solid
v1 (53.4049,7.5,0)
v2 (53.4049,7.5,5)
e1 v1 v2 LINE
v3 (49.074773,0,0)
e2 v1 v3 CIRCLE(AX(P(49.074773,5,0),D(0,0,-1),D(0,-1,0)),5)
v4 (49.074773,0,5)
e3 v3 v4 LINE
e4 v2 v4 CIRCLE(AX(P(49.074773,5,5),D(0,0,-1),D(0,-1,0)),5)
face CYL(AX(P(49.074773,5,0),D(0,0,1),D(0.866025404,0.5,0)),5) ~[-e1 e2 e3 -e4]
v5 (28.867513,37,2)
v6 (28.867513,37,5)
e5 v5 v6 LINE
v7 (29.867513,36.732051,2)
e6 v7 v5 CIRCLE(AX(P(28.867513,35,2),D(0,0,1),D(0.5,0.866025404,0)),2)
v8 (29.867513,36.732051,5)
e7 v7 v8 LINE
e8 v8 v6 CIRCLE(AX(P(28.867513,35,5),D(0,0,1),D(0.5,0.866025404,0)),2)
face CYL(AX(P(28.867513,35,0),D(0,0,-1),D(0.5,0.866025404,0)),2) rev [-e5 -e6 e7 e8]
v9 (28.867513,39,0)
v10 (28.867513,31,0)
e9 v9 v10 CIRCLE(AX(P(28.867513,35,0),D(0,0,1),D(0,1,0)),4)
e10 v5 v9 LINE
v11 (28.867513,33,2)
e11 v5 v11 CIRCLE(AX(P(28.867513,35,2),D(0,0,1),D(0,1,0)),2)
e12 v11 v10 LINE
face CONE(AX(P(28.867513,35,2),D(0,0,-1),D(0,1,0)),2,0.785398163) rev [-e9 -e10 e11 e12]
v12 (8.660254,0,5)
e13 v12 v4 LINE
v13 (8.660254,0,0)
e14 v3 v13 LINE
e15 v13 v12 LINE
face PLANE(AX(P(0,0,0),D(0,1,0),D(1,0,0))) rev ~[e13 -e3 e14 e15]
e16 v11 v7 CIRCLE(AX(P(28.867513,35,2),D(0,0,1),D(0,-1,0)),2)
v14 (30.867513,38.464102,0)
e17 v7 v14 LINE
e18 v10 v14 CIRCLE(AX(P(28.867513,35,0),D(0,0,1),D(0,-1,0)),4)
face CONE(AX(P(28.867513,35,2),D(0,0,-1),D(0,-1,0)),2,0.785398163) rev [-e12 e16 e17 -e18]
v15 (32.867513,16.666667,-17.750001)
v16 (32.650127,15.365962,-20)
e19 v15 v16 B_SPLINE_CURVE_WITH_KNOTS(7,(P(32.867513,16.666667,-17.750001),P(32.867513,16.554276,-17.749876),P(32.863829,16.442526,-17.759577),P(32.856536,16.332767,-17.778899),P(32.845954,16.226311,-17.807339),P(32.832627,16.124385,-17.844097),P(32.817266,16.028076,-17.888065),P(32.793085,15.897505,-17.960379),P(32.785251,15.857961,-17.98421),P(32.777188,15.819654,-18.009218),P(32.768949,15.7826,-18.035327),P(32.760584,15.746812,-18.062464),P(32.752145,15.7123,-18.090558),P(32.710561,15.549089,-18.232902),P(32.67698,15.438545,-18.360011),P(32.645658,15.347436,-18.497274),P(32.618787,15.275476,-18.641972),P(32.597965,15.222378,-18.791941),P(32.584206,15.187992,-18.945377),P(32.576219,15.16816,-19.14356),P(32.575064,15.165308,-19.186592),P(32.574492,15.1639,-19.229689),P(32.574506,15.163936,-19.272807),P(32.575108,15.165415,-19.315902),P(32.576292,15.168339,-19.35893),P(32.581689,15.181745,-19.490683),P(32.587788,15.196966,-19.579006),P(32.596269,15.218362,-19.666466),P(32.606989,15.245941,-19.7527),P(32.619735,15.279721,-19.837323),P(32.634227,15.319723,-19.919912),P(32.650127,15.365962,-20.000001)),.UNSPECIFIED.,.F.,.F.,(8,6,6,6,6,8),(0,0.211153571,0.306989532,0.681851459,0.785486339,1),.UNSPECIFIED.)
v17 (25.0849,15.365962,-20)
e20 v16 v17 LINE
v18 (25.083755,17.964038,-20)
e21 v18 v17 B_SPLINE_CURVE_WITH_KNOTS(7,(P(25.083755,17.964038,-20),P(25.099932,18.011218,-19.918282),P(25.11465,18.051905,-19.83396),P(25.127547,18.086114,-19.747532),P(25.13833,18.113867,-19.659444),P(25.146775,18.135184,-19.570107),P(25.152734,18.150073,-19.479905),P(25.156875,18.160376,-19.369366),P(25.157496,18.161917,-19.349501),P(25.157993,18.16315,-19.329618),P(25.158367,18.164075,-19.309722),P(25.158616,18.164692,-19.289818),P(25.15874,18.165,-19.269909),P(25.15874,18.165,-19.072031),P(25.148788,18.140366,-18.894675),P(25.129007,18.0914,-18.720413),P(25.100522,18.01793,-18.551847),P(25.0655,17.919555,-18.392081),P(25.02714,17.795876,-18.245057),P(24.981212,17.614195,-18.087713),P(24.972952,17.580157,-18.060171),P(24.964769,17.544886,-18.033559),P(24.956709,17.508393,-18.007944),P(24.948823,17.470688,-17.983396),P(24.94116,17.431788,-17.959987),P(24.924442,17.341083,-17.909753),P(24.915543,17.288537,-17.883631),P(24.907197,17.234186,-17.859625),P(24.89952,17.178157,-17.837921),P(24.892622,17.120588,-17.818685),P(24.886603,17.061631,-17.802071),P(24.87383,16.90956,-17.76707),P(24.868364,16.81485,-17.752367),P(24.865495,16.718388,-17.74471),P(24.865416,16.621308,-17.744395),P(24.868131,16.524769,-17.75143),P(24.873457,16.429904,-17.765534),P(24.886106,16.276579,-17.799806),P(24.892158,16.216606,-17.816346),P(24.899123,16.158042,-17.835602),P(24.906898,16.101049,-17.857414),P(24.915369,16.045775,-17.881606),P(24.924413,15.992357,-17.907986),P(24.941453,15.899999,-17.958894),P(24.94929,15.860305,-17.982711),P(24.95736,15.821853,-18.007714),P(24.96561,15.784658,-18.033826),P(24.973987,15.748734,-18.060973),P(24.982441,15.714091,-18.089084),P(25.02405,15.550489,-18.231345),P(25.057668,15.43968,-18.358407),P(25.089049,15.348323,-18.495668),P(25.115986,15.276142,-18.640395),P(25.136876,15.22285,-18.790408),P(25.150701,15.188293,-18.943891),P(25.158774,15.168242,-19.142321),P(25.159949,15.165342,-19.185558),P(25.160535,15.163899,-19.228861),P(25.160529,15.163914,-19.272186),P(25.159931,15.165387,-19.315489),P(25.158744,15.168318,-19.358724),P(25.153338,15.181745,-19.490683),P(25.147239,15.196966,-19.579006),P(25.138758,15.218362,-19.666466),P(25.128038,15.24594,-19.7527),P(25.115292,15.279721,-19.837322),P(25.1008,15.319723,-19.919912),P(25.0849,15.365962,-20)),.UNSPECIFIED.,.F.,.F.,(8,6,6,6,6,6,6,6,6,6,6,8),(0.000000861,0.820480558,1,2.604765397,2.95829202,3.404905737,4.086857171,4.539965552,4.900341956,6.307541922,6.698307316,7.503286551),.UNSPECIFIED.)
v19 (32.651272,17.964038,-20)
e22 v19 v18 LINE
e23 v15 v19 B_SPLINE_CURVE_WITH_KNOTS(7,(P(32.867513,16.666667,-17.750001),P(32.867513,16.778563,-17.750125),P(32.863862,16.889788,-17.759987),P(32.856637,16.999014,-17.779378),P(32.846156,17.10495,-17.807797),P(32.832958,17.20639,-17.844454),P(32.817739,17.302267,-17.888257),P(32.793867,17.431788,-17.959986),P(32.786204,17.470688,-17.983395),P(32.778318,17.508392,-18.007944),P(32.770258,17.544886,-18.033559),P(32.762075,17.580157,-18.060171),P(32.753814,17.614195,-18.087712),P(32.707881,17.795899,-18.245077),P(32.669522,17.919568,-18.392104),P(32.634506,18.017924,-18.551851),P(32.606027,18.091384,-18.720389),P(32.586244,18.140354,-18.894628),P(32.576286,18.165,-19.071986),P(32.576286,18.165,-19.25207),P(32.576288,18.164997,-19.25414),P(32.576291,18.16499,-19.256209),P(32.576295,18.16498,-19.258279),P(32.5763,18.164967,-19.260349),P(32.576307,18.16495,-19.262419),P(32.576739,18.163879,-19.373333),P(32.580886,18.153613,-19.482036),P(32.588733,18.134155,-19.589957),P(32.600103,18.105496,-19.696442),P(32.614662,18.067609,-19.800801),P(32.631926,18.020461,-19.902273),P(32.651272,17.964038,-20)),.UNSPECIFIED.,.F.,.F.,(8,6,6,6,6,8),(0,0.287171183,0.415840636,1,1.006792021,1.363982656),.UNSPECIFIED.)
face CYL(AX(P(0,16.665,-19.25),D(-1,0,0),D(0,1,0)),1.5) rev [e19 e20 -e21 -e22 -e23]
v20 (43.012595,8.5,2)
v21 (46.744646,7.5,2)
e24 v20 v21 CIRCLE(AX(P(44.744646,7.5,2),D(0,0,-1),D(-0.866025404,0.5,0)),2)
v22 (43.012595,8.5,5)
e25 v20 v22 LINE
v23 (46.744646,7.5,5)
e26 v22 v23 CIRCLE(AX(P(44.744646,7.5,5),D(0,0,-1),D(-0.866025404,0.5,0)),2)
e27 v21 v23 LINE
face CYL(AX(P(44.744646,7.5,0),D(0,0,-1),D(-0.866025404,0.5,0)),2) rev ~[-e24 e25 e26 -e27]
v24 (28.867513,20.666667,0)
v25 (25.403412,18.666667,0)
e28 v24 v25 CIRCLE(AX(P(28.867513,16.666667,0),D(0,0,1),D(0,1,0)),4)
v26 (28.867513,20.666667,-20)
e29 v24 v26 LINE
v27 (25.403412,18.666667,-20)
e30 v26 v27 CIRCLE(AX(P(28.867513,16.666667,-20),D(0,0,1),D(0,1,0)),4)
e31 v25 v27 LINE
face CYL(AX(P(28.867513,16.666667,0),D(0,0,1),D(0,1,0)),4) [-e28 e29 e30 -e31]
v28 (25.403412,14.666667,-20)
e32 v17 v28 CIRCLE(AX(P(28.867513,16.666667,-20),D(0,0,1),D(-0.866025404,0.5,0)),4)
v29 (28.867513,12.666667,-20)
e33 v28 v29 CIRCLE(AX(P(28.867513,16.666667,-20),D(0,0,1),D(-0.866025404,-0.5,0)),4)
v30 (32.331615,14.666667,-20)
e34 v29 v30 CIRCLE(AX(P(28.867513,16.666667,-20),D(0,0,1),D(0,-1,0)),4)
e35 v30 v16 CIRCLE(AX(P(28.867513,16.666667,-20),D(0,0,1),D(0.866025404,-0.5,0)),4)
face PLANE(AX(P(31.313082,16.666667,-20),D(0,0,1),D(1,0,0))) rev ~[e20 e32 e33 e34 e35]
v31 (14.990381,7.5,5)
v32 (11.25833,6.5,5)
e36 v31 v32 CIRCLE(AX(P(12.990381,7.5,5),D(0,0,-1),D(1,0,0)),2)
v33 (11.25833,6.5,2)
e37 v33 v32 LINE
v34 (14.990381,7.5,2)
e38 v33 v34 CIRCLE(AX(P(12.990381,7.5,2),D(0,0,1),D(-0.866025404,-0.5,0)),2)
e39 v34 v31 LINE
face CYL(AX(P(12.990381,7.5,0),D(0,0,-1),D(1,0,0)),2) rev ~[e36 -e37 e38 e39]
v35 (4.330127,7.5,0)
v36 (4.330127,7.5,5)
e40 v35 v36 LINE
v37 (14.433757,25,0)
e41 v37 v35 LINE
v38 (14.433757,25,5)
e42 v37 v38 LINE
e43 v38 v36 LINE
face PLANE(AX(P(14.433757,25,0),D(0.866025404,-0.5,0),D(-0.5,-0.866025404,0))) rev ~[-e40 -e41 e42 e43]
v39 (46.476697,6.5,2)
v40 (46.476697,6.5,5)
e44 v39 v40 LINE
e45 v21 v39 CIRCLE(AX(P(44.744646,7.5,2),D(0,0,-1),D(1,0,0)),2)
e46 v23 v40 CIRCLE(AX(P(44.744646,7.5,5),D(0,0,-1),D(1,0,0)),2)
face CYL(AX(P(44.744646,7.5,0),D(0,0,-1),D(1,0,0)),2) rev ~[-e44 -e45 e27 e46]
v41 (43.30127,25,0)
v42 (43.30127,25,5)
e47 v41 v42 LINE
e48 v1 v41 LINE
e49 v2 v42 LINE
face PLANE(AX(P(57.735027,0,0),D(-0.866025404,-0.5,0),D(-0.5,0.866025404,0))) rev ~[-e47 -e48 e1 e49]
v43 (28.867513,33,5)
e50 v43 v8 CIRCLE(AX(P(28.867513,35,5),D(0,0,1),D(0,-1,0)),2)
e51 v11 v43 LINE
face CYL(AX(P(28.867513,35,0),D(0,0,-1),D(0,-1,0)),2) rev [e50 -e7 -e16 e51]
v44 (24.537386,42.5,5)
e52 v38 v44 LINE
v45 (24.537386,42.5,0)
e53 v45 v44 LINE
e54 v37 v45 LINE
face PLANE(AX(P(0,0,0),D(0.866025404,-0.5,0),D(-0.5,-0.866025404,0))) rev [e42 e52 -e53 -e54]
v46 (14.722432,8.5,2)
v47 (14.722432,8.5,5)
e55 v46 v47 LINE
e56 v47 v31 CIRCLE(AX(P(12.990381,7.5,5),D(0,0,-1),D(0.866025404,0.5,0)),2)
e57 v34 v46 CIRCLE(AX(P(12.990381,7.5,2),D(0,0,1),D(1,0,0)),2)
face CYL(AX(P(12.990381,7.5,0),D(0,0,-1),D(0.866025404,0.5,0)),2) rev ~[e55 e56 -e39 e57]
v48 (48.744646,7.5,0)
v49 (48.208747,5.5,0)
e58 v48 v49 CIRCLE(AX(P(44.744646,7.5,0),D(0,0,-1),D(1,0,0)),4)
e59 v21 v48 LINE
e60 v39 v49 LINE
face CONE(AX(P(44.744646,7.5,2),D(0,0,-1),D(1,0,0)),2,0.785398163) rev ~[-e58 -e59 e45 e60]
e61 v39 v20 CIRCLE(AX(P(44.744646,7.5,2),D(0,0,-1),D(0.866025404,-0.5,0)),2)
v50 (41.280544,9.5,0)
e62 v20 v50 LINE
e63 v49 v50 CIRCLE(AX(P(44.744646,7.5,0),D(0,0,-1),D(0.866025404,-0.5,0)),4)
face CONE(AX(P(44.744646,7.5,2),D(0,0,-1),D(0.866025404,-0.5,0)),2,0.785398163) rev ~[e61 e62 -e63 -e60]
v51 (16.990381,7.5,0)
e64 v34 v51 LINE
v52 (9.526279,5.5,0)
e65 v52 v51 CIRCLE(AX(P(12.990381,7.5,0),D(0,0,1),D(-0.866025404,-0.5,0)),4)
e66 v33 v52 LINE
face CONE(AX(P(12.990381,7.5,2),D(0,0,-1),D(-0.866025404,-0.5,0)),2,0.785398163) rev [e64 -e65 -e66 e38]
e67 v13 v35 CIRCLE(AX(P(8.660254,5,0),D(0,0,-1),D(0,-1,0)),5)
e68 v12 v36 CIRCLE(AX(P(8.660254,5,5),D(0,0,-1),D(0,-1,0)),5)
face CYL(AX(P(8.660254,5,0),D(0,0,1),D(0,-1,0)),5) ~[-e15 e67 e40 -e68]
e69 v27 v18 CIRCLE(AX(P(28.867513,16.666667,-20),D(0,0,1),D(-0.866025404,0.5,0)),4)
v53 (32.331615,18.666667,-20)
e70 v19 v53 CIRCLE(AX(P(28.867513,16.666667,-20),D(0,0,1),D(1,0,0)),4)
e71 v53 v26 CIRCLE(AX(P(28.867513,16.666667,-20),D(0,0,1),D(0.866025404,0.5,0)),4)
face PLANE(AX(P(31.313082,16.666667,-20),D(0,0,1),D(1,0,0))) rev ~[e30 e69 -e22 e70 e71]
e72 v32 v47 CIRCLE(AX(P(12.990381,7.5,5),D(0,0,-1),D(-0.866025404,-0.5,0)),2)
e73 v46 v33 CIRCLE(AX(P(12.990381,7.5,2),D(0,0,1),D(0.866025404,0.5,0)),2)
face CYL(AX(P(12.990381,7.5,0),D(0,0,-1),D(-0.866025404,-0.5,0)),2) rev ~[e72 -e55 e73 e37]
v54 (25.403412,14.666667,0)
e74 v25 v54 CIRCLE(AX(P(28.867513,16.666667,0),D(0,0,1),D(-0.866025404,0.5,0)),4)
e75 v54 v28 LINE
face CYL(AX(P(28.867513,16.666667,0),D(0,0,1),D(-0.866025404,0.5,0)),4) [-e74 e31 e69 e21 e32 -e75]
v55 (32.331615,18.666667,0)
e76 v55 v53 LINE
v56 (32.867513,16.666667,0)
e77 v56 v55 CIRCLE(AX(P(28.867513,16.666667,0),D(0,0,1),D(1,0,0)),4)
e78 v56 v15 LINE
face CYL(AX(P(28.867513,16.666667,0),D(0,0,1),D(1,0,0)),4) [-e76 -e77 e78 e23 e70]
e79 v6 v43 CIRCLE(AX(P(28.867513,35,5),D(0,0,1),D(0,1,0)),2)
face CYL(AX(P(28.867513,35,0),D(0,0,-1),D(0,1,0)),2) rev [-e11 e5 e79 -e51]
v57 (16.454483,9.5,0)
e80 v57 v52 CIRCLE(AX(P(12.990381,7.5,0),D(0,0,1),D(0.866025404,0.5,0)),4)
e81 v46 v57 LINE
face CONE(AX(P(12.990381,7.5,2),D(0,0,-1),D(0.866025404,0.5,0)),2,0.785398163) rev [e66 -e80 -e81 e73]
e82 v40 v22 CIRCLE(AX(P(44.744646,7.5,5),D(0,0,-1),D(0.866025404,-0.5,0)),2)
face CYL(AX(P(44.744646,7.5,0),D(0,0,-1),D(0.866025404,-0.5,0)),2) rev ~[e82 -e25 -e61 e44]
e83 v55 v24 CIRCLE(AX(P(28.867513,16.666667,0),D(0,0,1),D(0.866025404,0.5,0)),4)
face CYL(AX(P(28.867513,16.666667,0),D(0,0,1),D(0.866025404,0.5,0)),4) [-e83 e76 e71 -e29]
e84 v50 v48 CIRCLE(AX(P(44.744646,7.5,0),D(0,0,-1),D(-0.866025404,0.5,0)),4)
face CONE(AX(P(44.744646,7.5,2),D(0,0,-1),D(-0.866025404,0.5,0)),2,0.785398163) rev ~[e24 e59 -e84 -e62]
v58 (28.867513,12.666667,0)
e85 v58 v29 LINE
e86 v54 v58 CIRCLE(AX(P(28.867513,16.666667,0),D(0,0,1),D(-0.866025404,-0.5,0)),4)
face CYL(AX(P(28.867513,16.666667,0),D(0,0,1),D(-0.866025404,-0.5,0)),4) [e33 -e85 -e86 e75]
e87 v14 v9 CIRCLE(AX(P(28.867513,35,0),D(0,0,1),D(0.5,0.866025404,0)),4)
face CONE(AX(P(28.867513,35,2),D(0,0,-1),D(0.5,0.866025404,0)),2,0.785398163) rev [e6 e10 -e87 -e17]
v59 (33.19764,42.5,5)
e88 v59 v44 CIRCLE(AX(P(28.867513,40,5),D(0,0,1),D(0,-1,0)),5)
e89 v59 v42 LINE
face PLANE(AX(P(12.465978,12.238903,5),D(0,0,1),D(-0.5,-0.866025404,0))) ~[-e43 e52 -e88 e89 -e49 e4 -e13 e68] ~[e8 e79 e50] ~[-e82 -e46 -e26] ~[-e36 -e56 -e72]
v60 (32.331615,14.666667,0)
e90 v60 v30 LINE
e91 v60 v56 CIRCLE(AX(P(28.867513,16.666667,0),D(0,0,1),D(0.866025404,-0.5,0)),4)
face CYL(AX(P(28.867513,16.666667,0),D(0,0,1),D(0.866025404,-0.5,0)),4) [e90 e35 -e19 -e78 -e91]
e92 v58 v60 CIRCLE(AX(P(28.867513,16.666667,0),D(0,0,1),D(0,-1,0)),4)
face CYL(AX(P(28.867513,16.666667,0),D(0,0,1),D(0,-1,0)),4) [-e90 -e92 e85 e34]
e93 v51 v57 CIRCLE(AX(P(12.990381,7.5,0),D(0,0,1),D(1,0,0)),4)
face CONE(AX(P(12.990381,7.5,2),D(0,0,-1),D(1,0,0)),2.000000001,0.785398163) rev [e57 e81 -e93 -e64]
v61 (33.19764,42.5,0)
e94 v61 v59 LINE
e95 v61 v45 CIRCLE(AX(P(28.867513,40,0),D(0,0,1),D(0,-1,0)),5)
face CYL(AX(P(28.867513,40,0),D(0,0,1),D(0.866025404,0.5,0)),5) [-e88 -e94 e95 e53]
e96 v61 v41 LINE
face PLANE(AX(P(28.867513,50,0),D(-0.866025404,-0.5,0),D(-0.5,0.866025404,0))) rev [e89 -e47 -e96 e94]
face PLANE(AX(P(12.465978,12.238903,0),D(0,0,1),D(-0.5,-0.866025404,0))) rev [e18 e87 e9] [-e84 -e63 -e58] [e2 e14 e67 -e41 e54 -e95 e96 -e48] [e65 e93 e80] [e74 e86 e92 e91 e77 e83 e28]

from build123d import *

# Parameters (mm, degrees)
F1_DEPTH = 5
F2_DEPTH = 20
F4_DEPTH = 37.6
F5_SIZE  = 2
F6_R     = 5


# Not quite as in the source:
# - a pattern or mirror of a feature is missing from the dataset's text; its kind, count and spacing are read off the source's solid


with BuildPart() as f1:
    # F0 (on Top) → F1 (new body)
    with BuildSketch(Plane.XY):
        with BuildLine():
            Line((11.2583302492, 6.5), (0, 0))
            Line((0, 0), (28.8675134595, 0))
            Line((28.8675134595, 0), (28.8675134595, 12.6666666667))
            ThreePointArc((28.8675134595, 12.6666666667), (26.8675134595, 13.2025650515), (25.4034118443, 14.6666666667))
            Line((25.4034118443, 14.6666666667), (14.7224318643, 8.5))
            ThreePointArc((14.7224318643, 8.5), (14.9222327093, 8.0176380902), (14.9903810568, 7.5))
            ThreePointArc((14.9903810568, 7.5), (13.508019147, 5.5681483474), (11.2583302492, 6.5))
        make_face()
        with BuildLine():
            Line((14.4337567297, 25), (0, 0))
            Line((0, 0), (11.2583302492, 6.5))
            ThreePointArc((11.2583302492, 6.5), (11.9903810568, 9.2320508076), (14.7224318643, 8.5))
            Line((14.7224318643, 8.5), (25.4034118443, 14.6666666667))
            ThreePointArc((25.4034118443, 14.6666666667), (24.8675134595, 16.6666666667), (25.4034118443, 18.6666666667))
            Line((25.4034118443, 18.6666666667), (14.4337567297, 25))
        make_face()
        with BuildLine():
            Line((28.8675134595, 12.6666666667), (28.8675134595, 0))
            Line((28.8675134595, 0), (57.735026919, 0))
            Line((57.735026919, 0), (46.4766966698, 6.5))
            ThreePointArc((46.4766966698, 6.5), (43.7446458622, 5.7679491924), (43.0125950546, 8.5))
            Line((43.0125950546, 8.5), (32.3316150746, 14.6666666667))
            ThreePointArc((32.3316150746, 14.6666666667), (30.8675134595, 13.2025650515), (28.8675134595, 12.6666666667))
        make_face()
        with BuildLine():
            ThreePointArc((28.8675134595, 20.6666666667), (26.8675134595, 20.1307682818), (25.4034118443, 18.6666666667))
            Line((25.4034118443, 18.6666666667), (28.8675134595, 16.6666666667))
            Line((28.8675134595, 16.6666666667), (28.8675134595, 20.6666666667))
        make_face()
        with BuildLine():
            Line((28.8675134595, 16.6666666667), (25.4034118443, 18.6666666667))
            ThreePointArc((25.4034118443, 18.6666666667), (24.8675134595, 16.6666666667), (25.4034118443, 14.6666666667))
            Line((25.4034118443, 14.6666666667), (28.8675134595, 16.6666666667))
        make_face()
        with BuildLine():
            Line((46.4766966698, 6.5), (57.735026919, 0))
            Line((57.735026919, 0), (43.3012701892, 25))
            Line((43.3012701892, 25), (32.3316150746, 18.6666666667))
            ThreePointArc((32.3316150746, 18.6666666667), (32.7312167646, 17.7019428471), (32.8675134595, 16.6666666667))
            ThreePointArc((32.8675134595, 16.6666666667), (32.7312167646, 15.6313904863), (32.3316150746, 14.6666666667))
            Line((32.3316150746, 14.6666666667), (43.0125950546, 8.5))
            ThreePointArc((43.0125950546, 8.5), (45.2622839524, 9.4318516526), (46.7446458622, 7.5))
            ThreePointArc((46.7446458622, 7.5), (46.6764975148, 6.9823619098), (46.4766966698, 6.5))
        make_face()
        with BuildLine():
            ThreePointArc((25.4034118443, 14.6666666667), (26.8675134595, 13.2025650515), (28.8675134595, 12.6666666667))
            Line((28.8675134595, 12.6666666667), (28.8675134595, 16.6666666667))
            Line((28.8675134595, 16.6666666667), (25.4034118443, 14.6666666667))
        make_face()
        with BuildLine():
            Line((28.8675134595, 16.6666666667), (28.8675134595, 12.6666666667))
            ThreePointArc((28.8675134595, 12.6666666667), (30.8675134595, 13.2025650515), (32.3316150746, 14.6666666667))
            Line((32.3316150746, 14.6666666667), (28.8675134595, 16.6666666667))
        make_face()
        with BuildLine():
            Line((28.8675134595, 20.6666666667), (28.8675134595, 16.6666666667))
            Line((28.8675134595, 16.6666666667), (32.3316150746, 18.6666666667))
            ThreePointArc((32.3316150746, 18.6666666667), (30.8675134595, 20.1307682818), (28.8675134595, 20.6666666667))
        make_face()
        with BuildLine():
            Line((32.3316150746, 18.6666666667), (28.8675134595, 16.6666666667))
            Line((28.8675134595, 16.6666666667), (32.3316150746, 14.6666666667))
            ThreePointArc((32.3316150746, 14.6666666667), (32.7312167646, 15.6313904863), (32.8675134595, 16.6666666667))
            ThreePointArc((32.8675134595, 16.6666666667), (32.7312167646, 17.7019428471), (32.3316150746, 18.6666666667))
        make_face()
    extrude(amount=F1_DEPTH)

    # F1_copies: F1 across plane


with BuildPart() as f1_1:
    add(f1.part)
    add(f1.part.mirror(Plane(origin=(0, 0, 0), x_dir=(0.8660254038, 0.5, 0), z_dir=(-0.5, 0.8660254038, 0))))

    # F0 (on Top) → F2 (join)
    with BuildSketch(Plane.XY):
        with BuildLine():
            Line((32.3316150746, 18.6666666667), (28.8675134595, 16.6666666667))
            Line((28.8675134595, 16.6666666667), (32.3316150746, 14.6666666667))
            ThreePointArc((32.3316150746, 14.6666666667), (32.7312167646, 15.6313904863), (32.8675134595, 16.6666666667))
            ThreePointArc((32.8675134595, 16.6666666667), (32.7312167646, 17.7019428471), (32.3316150746, 18.6666666667))
        make_face()
        with BuildLine():
            Line((28.8675134595, 20.6666666667), (28.8675134595, 16.6666666667))
            Line((28.8675134595, 16.6666666667), (32.3316150746, 18.6666666667))
            ThreePointArc((32.3316150746, 18.6666666667), (30.8675134595, 20.1307682818), (28.8675134595, 20.6666666667))
        make_face()
        with BuildLine():
            ThreePointArc((28.8675134595, 20.6666666667), (26.8675134595, 20.1307682818), (25.4034118443, 18.6666666667))
            Line((25.4034118443, 18.6666666667), (28.8675134595, 16.6666666667))
            Line((28.8675134595, 16.6666666667), (28.8675134595, 20.6666666667))
        make_face()
        with BuildLine():
            Line((28.8675134595, 16.6666666667), (25.4034118443, 18.6666666667))
            ThreePointArc((25.4034118443, 18.6666666667), (24.8675134595, 16.6666666667), (25.4034118443, 14.6666666667))
            Line((25.4034118443, 14.6666666667), (28.8675134595, 16.6666666667))
        make_face()
        with BuildLine():
            ThreePointArc((25.4034118443, 14.6666666667), (26.8675134595, 13.2025650515), (28.8675134595, 12.6666666667))
            Line((28.8675134595, 12.6666666667), (28.8675134595, 16.6666666667))
            Line((28.8675134595, 16.6666666667), (25.4034118443, 14.6666666667))
        make_face()
        with BuildLine():
            Line((28.8675134595, 16.6666666667), (28.8675134595, 12.6666666667))
            ThreePointArc((28.8675134595, 12.6666666667), (30.8675134595, 13.2025650515), (32.3316150746, 14.6666666667))
            Line((32.3316150746, 14.6666666667), (28.8675134595, 16.6666666667))
        make_face()
    extrude(amount=-F2_DEPTH)

    # F3 (on Right) → F4 (cut)
    with BuildSketch(Plane.YZ):
        with BuildLine():
            ThreePointArc((15.165, -19.25), (16.665, -20.75), (18.165, -19.25))
            ThreePointArc((18.165, -19.25), (16.665, -17.75), (15.165, -19.25))
        make_face()
    extrude(amount=F4_DEPTH, mode=Mode.SUBTRACT)

    # F5
    f5_edges = [f1_1.edges().sort_by_distance(p)[0] for p in [
        (10.990381, 7.5, 0),
        (28.867513, 37, 0),
        (46.476697, 6.5, 0),
    ]]
    chamfer(f5_edges, length=F5_SIZE)

    # F6
    f6_edges = [f1_1.edges().sort_by_distance(p)[0] for p in [
        (57.735027, 0, 2.5),
        (0, 0, 2.5),
        (28.867513, 50, 2.5),
    ]]
    fillet(f6_edges, radius=F6_R)


solid = f1_1.part
